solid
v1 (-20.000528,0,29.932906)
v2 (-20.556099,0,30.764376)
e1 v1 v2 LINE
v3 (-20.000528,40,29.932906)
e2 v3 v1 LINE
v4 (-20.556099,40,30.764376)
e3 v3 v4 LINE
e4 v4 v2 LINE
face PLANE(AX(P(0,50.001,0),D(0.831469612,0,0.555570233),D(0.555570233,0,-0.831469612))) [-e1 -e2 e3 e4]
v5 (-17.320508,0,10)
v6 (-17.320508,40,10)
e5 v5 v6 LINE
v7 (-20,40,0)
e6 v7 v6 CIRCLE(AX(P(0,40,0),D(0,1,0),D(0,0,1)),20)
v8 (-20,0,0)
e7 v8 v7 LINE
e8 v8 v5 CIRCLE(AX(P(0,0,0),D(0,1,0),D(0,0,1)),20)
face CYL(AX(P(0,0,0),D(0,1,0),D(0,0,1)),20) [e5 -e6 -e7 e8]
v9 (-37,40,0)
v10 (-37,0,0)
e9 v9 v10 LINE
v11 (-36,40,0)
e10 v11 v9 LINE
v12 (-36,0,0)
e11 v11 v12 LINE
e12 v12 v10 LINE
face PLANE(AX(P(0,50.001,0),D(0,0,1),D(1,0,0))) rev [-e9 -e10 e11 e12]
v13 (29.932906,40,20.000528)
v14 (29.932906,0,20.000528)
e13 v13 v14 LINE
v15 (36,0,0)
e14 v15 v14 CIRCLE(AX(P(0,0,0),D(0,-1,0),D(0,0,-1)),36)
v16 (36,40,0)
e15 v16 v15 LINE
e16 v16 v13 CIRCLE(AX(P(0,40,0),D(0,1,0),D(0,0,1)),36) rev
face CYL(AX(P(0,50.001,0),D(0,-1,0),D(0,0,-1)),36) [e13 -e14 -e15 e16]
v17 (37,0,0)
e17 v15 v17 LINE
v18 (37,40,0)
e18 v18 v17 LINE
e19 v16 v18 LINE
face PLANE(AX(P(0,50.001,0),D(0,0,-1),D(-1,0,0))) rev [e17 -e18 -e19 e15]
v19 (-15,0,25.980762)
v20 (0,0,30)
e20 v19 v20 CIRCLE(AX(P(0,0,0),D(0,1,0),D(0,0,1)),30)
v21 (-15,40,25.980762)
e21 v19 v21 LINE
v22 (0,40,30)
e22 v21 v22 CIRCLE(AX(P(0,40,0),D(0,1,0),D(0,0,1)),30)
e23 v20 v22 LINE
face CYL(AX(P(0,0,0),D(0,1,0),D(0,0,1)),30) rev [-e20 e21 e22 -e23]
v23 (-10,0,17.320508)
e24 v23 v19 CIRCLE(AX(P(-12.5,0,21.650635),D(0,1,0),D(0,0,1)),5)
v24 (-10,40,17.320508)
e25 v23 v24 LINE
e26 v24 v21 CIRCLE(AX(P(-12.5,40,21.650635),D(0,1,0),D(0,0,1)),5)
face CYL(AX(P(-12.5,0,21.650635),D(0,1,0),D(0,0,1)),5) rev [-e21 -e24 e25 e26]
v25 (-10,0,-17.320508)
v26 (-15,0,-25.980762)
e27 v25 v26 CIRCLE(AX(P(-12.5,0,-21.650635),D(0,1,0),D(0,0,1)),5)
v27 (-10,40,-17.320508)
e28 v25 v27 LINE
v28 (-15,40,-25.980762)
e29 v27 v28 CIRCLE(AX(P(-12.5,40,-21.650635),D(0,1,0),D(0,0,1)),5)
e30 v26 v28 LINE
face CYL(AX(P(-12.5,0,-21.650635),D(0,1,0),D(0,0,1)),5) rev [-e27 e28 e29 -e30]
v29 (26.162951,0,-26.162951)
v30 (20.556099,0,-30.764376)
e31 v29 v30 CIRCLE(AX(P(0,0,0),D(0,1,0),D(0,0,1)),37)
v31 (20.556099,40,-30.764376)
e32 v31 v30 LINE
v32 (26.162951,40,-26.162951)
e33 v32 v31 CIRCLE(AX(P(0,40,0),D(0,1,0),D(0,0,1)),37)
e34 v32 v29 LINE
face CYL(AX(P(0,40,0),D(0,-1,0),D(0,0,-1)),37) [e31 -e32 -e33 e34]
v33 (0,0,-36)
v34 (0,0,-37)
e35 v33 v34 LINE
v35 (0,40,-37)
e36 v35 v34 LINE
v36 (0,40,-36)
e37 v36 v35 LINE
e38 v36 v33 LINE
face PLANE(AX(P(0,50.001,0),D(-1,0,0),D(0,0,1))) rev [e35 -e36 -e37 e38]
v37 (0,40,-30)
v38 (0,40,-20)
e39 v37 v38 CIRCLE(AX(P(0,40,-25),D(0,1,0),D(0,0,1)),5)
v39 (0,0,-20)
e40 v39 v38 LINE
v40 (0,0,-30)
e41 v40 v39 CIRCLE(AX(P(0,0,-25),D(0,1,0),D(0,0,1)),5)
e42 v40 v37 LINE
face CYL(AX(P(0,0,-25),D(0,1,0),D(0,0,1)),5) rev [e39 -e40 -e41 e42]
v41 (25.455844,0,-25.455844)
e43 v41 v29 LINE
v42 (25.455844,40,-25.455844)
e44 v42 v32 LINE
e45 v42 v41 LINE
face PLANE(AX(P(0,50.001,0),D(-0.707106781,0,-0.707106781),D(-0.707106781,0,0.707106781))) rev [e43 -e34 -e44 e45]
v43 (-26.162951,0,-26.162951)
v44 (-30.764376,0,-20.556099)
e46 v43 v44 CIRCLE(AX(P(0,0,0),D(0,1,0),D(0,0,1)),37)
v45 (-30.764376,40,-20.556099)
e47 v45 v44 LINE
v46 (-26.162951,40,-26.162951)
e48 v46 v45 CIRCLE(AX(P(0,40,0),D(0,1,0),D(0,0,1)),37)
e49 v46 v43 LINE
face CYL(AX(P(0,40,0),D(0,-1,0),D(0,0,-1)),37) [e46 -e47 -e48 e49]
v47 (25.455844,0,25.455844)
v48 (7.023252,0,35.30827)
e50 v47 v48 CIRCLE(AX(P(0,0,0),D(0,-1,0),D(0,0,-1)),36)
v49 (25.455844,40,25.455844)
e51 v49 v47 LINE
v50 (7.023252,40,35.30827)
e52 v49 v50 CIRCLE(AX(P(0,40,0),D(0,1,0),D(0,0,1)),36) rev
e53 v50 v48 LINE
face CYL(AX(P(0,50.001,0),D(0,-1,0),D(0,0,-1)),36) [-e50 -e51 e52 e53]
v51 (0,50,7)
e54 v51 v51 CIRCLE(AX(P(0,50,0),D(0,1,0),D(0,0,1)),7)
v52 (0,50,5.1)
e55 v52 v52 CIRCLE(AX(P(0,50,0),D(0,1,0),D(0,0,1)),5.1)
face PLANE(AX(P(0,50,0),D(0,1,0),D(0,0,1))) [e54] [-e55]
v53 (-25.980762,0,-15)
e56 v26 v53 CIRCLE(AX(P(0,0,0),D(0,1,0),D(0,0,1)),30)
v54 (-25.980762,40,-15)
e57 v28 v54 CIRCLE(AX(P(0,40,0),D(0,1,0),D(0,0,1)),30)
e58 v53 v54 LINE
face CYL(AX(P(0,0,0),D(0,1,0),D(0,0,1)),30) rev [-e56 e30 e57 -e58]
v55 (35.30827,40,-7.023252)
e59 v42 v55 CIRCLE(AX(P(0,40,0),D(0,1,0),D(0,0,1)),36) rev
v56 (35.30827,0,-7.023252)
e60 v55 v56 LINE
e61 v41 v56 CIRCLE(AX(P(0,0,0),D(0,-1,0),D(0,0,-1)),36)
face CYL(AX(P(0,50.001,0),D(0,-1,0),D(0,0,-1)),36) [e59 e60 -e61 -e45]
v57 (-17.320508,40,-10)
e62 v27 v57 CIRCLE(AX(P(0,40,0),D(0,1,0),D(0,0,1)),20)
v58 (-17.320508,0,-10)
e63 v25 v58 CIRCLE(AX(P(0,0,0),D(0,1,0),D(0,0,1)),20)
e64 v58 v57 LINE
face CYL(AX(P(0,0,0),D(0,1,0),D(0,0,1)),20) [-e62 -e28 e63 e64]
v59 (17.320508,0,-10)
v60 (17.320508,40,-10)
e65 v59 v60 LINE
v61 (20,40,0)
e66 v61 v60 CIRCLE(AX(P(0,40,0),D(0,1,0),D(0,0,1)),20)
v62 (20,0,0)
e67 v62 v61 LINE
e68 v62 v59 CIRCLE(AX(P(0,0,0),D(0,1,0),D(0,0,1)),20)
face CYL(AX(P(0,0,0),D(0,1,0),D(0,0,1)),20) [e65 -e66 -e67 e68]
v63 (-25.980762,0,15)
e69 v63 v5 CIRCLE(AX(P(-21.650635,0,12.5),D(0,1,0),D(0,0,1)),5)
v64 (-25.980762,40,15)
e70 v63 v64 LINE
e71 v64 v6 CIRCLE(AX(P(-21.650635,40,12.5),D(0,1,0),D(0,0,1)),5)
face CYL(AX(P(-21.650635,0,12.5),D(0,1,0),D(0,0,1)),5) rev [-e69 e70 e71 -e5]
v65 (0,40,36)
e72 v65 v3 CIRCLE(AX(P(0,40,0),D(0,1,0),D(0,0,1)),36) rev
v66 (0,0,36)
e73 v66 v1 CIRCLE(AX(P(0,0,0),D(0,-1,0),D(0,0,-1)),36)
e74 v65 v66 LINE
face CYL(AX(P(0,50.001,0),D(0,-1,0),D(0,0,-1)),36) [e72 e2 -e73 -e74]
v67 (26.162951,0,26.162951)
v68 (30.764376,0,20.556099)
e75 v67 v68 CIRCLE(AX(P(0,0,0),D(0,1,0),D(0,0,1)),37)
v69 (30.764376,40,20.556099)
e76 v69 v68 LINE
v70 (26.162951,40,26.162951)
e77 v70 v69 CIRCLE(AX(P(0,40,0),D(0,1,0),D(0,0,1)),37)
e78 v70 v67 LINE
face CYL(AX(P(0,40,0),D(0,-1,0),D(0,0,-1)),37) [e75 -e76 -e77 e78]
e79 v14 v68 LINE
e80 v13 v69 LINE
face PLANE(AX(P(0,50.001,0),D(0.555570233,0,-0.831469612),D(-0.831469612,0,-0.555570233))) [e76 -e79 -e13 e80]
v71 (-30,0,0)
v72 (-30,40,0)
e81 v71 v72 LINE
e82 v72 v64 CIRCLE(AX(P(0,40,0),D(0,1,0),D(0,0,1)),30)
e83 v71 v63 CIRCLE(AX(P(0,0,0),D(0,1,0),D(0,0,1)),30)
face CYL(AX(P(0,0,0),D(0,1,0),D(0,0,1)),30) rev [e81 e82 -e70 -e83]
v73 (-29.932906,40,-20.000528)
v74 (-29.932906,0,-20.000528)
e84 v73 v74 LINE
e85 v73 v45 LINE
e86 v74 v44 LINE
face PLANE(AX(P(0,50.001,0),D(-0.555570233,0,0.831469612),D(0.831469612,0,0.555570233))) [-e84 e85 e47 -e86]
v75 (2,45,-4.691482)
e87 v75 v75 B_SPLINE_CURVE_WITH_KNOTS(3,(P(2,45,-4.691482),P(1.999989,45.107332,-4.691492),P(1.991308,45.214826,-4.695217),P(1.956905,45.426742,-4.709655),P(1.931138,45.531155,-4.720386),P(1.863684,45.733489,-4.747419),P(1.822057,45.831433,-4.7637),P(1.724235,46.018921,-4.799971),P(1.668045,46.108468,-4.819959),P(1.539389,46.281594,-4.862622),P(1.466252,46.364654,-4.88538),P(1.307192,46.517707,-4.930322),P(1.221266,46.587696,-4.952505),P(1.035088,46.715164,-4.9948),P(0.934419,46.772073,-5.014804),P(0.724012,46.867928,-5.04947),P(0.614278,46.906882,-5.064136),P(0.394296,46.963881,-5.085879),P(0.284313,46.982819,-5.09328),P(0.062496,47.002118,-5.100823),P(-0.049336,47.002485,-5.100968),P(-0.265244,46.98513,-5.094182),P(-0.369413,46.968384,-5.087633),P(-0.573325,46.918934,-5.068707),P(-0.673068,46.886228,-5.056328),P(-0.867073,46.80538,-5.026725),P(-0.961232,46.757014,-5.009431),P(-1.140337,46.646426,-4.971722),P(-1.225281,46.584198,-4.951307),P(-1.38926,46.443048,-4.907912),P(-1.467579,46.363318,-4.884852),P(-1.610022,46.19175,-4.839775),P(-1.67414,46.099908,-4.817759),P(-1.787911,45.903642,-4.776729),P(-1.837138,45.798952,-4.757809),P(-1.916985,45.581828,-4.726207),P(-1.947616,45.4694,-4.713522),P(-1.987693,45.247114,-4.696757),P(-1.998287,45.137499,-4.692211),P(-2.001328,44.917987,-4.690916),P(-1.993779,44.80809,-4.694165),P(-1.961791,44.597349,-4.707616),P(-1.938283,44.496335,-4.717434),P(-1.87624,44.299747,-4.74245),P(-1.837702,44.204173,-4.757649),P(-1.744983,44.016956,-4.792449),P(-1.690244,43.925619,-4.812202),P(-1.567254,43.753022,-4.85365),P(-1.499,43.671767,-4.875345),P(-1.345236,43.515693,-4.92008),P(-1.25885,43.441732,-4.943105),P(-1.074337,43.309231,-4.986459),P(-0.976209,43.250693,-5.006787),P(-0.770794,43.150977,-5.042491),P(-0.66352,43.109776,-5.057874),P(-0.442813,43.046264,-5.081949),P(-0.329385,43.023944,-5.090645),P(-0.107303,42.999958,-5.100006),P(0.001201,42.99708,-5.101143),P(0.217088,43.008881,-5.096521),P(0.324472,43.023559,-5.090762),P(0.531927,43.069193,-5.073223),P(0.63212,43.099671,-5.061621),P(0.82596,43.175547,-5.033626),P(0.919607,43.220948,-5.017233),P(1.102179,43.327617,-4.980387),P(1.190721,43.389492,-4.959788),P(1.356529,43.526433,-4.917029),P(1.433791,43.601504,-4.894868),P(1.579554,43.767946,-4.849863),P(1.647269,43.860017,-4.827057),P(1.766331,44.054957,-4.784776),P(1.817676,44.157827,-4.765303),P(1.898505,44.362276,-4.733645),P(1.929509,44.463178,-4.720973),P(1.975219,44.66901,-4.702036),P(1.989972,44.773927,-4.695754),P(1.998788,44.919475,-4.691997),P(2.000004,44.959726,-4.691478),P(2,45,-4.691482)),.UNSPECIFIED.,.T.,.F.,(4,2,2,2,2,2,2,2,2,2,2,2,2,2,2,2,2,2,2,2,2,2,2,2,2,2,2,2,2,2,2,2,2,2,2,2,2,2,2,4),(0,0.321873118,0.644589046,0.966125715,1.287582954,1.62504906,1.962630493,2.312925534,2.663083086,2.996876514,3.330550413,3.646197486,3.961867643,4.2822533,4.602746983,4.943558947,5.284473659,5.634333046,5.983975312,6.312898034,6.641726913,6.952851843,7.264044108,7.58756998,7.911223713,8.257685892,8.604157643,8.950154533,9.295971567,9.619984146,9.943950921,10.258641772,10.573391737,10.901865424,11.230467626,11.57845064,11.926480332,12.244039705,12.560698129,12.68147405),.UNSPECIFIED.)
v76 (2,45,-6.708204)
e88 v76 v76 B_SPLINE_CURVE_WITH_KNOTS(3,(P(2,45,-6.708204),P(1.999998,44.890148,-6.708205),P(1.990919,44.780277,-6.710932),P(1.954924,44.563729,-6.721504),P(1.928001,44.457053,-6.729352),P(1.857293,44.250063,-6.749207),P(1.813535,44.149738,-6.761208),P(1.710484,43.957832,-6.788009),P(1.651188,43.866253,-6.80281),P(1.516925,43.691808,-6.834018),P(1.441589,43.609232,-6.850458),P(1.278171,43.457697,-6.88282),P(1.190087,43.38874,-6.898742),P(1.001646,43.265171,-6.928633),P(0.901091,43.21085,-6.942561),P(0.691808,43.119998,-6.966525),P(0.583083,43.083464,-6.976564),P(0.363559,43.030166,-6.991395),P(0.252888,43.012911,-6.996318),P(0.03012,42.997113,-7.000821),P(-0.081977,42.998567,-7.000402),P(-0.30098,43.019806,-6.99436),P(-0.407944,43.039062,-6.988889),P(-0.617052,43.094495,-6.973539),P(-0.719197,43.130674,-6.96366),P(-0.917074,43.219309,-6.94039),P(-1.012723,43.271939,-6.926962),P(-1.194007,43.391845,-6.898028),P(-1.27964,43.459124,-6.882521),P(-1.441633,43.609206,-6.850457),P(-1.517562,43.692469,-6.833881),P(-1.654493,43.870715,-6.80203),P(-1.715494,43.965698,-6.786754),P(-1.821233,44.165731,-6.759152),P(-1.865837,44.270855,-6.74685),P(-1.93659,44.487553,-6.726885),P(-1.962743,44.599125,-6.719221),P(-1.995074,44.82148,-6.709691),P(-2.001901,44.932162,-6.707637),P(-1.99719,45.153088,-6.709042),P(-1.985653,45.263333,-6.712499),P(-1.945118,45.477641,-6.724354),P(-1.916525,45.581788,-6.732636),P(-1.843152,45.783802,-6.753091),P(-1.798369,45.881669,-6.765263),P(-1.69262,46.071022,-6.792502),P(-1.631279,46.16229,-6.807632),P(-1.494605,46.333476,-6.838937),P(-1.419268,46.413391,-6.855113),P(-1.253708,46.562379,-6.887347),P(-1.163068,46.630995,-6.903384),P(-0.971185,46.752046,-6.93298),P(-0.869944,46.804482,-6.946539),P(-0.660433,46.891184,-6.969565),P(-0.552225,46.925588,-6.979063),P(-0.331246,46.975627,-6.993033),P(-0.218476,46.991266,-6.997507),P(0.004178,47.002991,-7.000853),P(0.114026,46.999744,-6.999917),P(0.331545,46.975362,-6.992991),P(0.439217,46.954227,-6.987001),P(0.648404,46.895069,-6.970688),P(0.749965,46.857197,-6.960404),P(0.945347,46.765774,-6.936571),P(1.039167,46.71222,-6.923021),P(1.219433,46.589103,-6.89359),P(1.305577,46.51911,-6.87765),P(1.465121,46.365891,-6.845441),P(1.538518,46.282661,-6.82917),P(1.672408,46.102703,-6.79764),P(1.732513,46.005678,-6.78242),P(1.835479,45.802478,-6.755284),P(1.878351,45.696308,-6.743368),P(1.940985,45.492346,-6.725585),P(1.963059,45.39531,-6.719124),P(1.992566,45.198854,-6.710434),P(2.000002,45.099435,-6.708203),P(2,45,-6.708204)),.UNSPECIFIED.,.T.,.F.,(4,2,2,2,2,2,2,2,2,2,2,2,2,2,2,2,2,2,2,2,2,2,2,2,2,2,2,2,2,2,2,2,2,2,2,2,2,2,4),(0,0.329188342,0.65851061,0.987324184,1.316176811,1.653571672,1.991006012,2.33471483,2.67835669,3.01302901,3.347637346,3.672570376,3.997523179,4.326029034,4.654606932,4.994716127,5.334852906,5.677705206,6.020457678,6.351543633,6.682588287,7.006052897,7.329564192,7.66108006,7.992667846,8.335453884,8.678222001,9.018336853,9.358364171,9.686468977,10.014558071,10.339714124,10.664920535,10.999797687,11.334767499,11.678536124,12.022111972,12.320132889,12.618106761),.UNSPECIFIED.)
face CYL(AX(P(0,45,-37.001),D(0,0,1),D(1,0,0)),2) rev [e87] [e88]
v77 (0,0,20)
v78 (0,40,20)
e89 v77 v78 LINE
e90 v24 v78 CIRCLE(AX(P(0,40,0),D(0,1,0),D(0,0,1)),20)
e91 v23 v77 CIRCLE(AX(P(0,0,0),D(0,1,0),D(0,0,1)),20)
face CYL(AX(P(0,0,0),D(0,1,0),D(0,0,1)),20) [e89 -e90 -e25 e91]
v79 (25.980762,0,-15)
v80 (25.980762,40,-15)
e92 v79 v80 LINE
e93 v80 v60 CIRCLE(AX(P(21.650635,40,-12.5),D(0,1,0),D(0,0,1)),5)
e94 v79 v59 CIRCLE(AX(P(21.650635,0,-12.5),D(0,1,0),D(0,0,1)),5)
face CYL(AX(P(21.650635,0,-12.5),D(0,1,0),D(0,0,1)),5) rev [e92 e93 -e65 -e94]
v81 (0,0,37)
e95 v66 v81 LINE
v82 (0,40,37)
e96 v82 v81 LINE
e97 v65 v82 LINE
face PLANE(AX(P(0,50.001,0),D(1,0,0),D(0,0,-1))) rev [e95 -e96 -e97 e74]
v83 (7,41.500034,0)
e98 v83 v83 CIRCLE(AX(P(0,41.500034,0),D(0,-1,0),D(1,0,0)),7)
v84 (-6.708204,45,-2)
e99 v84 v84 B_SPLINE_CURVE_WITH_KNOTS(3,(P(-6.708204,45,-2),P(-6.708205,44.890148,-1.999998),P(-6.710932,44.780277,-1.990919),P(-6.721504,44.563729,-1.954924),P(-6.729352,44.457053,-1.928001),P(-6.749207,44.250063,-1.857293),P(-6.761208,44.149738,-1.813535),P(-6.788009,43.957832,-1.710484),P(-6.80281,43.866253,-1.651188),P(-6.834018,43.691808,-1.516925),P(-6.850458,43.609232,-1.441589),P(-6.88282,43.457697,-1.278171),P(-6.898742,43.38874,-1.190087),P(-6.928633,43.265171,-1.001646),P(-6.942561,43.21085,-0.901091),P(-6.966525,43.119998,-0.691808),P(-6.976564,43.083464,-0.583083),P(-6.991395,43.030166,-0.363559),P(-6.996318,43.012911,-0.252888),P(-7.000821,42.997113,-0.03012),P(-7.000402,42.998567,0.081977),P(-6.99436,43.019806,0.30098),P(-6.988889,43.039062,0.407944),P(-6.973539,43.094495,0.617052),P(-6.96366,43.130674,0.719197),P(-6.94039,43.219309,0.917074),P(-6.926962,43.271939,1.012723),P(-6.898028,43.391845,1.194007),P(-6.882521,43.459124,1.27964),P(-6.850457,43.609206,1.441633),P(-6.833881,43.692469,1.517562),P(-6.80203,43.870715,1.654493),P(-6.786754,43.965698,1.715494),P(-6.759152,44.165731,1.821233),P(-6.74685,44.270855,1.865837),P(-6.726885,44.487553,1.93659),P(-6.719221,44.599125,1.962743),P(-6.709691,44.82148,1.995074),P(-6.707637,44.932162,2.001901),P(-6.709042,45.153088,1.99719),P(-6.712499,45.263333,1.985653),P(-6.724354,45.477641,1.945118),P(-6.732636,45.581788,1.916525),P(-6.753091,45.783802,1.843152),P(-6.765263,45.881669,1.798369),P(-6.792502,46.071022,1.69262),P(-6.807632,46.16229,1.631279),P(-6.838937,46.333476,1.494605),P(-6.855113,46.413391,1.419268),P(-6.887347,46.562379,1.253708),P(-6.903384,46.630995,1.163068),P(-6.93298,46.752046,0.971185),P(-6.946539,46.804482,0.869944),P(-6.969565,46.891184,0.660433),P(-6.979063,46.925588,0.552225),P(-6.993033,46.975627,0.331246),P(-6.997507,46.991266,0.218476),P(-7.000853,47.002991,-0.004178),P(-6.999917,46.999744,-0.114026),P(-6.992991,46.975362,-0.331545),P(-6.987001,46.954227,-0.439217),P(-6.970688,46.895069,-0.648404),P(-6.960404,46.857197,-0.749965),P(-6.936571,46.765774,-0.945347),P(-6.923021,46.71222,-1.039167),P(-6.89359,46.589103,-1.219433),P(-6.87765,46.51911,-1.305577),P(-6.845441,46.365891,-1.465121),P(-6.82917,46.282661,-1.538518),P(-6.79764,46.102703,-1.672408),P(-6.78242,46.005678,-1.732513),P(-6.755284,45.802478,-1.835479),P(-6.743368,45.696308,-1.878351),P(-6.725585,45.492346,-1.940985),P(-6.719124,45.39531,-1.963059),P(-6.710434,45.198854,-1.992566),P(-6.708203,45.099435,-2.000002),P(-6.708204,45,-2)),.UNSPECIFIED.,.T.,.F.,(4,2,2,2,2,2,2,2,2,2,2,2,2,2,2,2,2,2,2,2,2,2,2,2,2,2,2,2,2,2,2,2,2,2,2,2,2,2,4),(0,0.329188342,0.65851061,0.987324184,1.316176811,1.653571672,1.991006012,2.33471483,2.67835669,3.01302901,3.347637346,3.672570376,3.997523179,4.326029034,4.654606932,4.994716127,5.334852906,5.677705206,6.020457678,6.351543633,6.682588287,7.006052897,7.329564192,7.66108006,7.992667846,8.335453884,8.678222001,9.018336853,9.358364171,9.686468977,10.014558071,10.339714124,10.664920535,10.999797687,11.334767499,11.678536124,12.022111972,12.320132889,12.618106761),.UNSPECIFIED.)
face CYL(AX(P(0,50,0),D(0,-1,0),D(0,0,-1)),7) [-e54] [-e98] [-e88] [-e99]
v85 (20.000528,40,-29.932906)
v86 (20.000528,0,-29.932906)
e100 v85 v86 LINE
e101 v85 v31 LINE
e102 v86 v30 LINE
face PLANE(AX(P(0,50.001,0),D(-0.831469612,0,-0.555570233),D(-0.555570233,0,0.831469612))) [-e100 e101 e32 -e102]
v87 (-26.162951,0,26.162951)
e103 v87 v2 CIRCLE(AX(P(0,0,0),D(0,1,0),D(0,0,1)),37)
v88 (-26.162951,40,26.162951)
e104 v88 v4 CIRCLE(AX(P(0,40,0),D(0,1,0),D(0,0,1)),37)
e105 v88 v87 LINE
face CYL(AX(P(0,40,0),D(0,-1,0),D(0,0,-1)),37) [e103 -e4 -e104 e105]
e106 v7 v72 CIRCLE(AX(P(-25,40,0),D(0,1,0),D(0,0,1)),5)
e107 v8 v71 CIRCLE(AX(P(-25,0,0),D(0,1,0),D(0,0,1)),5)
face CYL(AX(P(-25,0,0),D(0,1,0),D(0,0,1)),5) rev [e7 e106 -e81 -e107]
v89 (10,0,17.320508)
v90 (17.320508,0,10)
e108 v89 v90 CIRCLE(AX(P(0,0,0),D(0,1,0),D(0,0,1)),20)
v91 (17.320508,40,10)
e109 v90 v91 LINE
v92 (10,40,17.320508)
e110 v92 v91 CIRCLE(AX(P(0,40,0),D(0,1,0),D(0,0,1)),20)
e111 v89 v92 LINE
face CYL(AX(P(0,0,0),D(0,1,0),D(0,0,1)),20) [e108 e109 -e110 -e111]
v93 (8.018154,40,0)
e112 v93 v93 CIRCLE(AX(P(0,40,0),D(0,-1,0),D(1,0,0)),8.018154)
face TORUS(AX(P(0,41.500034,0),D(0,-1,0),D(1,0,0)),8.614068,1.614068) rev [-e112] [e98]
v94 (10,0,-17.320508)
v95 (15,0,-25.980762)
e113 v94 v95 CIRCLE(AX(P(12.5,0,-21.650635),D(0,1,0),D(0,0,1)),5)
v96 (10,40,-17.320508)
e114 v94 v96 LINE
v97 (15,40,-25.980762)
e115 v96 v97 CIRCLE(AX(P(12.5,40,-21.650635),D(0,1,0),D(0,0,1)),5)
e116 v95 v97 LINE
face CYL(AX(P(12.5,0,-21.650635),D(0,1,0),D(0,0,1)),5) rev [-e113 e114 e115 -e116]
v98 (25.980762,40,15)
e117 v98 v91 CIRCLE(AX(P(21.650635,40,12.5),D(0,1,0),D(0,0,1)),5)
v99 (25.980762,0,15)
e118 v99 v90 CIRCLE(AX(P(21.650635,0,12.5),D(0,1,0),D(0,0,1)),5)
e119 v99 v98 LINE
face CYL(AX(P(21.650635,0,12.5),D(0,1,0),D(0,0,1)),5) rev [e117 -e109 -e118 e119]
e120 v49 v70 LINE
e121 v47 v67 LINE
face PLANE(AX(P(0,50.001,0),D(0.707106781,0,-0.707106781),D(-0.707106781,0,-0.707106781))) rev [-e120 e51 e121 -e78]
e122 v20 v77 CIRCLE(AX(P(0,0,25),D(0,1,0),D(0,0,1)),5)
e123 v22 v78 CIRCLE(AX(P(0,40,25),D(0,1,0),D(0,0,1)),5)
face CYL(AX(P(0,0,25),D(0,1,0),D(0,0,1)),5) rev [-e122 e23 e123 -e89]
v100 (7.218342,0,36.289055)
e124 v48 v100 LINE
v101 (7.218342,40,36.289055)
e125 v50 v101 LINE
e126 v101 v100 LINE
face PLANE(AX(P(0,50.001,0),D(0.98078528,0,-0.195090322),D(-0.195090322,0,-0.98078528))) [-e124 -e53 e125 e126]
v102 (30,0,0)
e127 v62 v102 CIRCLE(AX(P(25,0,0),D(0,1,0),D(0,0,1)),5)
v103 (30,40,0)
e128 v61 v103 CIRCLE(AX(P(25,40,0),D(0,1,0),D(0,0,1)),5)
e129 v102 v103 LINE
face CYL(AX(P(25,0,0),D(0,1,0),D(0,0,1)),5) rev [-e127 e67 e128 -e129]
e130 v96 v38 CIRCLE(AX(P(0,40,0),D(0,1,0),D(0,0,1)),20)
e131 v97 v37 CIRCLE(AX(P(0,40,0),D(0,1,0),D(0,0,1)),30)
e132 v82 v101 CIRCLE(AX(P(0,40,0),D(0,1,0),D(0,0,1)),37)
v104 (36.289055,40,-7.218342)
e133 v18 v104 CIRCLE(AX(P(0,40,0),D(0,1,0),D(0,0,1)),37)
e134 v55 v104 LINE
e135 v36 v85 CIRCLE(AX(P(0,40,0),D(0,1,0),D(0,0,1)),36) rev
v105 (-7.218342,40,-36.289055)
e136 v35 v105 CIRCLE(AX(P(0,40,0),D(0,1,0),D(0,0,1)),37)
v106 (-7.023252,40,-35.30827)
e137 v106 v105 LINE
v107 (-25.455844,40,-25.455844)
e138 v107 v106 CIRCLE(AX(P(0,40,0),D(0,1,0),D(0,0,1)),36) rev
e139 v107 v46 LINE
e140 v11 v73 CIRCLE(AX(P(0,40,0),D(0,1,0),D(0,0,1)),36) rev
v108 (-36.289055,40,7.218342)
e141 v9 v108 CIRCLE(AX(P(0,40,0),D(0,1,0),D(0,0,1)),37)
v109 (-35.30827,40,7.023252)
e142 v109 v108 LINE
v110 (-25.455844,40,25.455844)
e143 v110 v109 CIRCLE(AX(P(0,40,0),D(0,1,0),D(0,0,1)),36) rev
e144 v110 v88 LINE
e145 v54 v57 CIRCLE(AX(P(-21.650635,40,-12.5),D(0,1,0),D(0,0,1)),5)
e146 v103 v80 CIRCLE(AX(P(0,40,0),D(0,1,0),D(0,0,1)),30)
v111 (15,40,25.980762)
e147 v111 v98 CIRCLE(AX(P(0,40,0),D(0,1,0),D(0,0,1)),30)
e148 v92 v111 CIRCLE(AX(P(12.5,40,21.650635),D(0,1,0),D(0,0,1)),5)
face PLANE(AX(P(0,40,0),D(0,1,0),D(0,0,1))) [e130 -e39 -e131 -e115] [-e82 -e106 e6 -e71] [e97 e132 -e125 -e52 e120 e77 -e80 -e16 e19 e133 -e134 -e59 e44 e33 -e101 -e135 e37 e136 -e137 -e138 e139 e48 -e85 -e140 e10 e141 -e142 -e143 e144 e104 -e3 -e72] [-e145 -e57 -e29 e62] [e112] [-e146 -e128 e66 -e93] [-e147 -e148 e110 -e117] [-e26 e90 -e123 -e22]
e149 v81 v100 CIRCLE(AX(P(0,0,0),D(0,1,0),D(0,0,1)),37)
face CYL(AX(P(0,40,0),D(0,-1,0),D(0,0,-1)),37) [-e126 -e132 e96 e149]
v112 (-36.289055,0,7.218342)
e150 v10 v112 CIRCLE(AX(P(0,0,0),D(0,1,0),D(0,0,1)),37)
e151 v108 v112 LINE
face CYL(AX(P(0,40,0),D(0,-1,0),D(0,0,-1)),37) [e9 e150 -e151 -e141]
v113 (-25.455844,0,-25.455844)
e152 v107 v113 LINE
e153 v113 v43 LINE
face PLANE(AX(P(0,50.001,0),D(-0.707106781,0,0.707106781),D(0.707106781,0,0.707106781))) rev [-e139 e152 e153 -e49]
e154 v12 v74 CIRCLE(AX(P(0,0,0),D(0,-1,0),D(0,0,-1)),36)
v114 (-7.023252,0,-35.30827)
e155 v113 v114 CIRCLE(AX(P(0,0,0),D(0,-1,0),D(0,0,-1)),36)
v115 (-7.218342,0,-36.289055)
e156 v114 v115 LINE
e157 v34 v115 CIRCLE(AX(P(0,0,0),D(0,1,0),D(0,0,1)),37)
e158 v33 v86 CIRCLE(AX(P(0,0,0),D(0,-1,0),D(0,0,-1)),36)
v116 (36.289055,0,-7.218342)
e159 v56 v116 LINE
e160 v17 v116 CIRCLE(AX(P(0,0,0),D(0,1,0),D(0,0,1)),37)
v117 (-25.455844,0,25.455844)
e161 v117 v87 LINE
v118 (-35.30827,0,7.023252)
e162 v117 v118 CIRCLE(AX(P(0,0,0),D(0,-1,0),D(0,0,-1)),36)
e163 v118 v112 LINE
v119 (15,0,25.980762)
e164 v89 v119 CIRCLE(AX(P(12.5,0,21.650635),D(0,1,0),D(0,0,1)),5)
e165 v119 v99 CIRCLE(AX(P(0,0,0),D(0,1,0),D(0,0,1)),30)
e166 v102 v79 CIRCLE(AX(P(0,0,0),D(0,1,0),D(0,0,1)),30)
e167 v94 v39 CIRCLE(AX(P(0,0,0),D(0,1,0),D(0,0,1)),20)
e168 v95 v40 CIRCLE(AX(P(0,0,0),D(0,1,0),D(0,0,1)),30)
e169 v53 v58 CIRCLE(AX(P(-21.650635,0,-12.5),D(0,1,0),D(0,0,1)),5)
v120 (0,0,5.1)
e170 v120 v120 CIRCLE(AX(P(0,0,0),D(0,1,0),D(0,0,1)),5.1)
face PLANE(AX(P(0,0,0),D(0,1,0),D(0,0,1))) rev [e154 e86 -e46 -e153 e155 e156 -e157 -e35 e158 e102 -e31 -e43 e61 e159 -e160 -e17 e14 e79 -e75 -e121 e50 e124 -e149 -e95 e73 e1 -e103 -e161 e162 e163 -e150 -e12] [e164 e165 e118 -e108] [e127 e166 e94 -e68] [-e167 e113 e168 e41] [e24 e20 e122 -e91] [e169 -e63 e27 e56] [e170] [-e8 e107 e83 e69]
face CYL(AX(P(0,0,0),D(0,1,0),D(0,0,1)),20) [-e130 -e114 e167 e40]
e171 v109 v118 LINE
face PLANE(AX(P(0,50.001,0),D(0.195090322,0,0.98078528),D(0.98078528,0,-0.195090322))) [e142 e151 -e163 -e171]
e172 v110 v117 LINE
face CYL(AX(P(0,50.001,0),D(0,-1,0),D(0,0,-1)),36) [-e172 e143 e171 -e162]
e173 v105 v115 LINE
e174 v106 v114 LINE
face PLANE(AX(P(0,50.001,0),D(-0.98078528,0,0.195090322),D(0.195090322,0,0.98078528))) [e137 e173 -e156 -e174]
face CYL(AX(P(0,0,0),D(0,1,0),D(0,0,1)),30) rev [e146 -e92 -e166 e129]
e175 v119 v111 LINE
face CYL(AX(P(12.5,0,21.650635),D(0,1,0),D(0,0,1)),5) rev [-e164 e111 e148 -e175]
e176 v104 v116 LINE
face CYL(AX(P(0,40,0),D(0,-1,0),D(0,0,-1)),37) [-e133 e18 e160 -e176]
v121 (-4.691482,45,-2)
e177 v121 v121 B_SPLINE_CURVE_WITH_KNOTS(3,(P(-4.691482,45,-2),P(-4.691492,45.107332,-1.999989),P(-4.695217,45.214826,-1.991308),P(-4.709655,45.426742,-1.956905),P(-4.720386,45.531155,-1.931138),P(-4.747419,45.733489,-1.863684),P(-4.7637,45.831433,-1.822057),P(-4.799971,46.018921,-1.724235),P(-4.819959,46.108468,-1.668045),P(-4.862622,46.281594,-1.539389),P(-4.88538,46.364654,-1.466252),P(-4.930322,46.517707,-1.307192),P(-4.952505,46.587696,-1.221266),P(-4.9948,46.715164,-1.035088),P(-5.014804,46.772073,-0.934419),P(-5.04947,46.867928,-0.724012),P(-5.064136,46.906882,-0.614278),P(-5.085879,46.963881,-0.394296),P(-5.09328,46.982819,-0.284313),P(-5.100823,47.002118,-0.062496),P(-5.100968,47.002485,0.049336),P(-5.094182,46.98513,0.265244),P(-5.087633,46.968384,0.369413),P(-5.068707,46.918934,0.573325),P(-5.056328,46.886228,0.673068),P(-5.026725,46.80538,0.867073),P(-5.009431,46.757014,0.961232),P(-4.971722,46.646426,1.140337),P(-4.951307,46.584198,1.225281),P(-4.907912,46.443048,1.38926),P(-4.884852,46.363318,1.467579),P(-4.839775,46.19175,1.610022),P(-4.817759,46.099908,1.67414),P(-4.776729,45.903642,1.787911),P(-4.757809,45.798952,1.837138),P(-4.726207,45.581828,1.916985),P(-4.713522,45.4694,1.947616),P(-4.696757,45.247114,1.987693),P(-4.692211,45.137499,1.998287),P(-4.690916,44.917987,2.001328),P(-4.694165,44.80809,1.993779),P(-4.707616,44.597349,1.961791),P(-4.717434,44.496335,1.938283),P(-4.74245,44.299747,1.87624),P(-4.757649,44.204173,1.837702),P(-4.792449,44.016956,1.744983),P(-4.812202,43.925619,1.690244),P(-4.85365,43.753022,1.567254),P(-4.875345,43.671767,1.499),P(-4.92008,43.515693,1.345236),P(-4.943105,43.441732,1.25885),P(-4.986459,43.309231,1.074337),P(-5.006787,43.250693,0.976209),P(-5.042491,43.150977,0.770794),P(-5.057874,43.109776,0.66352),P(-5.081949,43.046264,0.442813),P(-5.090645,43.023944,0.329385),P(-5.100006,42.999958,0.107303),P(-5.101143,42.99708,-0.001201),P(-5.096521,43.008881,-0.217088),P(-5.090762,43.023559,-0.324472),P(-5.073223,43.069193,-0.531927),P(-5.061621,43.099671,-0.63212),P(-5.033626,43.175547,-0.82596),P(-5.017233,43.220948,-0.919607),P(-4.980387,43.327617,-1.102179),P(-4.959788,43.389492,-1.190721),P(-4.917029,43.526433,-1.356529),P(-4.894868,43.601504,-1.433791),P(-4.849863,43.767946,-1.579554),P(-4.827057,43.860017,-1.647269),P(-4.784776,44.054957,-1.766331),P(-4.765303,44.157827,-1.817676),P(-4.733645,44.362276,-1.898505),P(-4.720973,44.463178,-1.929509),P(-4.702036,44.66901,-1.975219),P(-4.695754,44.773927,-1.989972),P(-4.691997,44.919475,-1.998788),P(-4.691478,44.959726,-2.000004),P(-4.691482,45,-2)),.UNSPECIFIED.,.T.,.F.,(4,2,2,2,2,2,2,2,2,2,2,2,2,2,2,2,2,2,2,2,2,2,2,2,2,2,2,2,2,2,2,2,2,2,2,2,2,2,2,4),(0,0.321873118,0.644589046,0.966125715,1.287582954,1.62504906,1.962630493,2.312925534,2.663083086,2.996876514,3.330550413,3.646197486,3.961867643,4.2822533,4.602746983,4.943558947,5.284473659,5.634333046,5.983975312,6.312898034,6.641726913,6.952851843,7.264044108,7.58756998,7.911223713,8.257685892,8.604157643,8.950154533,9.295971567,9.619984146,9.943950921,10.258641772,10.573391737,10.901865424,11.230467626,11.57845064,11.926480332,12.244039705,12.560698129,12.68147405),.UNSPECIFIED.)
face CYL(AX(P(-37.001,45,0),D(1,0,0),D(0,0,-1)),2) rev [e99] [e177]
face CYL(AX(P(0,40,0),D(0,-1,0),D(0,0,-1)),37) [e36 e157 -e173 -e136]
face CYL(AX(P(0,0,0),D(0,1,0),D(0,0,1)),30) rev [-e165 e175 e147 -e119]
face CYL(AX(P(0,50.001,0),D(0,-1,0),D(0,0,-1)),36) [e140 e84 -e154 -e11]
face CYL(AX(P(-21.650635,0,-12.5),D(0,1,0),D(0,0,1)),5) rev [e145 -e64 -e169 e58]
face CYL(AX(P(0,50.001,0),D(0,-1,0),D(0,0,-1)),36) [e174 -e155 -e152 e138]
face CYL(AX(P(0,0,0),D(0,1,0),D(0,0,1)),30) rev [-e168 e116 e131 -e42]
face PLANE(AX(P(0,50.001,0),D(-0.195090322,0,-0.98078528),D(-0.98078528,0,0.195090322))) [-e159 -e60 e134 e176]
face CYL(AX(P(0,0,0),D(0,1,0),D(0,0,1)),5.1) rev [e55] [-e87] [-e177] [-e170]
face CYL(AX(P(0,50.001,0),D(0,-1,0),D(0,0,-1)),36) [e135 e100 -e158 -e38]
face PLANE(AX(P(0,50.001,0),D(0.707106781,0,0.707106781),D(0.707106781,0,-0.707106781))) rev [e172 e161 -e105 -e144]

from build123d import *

# Parameters (mm, degrees)
SKETCH_1_R               = 37
EXTRUDE_1_DEPTH          = 40
SKETCH_2_R               = 5.1
CUT_EXTRUDE_1_DEPTH      = 40
CUT_EXTRUDE_START        = -40
CUT_EXTRUDE_2_DEPTH      = 40
SKETCH_4_R               = 7
SKETCH_4_R_2             = 5.1
EXTRUDE_2_DEPTH          = 10
CUT_EXTRUDE_3_REACH      = 74.374
CUT_EXTRUDE_3_END_RADIUS = 7
SKETCH_6_R               = 2
CUT_EXTRUDE_4_REACH      = 74.374
CUT_EXTRUDE_4_END_RADIUS = 7
SKETCH_7_R               = 2
CUT_EXTRUDE_7_REACH      = 74.374
EXTRUDE_START            = -40
SKETCH_14_R              = 36
EXTRUDE_4_DEPTH          = 40
CUT_EXTRUDE_11_DEPTH     = 40
SKETCH_17_R              = 5.1
CUT_EXTRUDE_12_DEPTH     = 40


# Read off the part's stored shape, not the designer's step: the extrude step
with BuildPart() as part:
    # 草图1 → 凸台-拉伸1 (new body)
    with BuildSketch(Plane(origin=(0, 0, 0), x_dir=(1, 0, 0), z_dir=(0, 1, 0))):
        with Locations(Location((0, 0, 0), (0, 0, 270))):
            Circle(SKETCH_1_R)
    extrude(amount=EXTRUDE_1_DEPTH)

    # 草图2 → 切除-拉伸1 (cut)
    with BuildSketch(Plane(origin=(0, 40, 0), x_dir=(1, 0, 0), z_dir=(0, 1, 0))):
        with Locations(Location((0, 0, 0), (0, 0, 270))):
            Circle(SKETCH_2_R)
    extrude(amount=-CUT_EXTRUDE_1_DEPTH, mode=Mode.SUBTRACT)

    # 切除-拉伸2 outline → 切除-拉伸2 (cut)
    with BuildSketch(Plane(origin=(0, 40, 0), x_dir=(1, 0, 0), z_dir=(0, 1, 0)).offset(CUT_EXTRUDE_START)):
        with BuildLine():
            ThreePointArc((0, 25), (5, 30), (0, 35))
            ThreePointArc((0, 35), (-17.5, 30.310889132), (-30.310889132, 17.5))
            ThreePointArc((-30.310889132, 17.5), (-28.480762114, 10.669872981), (-21.650635095, 12.5))
            ThreePointArc((-21.650635095, 12.5), (-12.5, 21.650635095), (0, 25))
        make_face()
        with BuildLine():
            ThreePointArc((-21.650635095, -12.5), (-28.480762114, -10.669872981), (-30.310889132, -17.5))
            ThreePointArc((-30.310889132, -17.5), (-17.5, -30.310889132), (0, -35))
            ThreePointArc((0, -35), (5, -30), (0, -25))
            ThreePointArc((0, -25), (-12.5, -21.650635095), (-21.650635095, -12.5))
        make_face()
        with BuildLine():
            ThreePointArc((21.650635095, -12.5), (23.480762113, -19.330127019), (30.310889132, -17.5))
            ThreePointArc((30.310889132, -17.5), (35, 0), (30.310889132, 17.5))
            ThreePointArc((30.310889132, 17.5), (23.480762113, 19.330127019), (21.650635095, 12.5))
            ThreePointArc((21.650635095, 12.5), (25, 0), (21.650635095, -12.5))
        make_face()
    extrude(amount=CUT_EXTRUDE_2_DEPTH, mode=Mode.SUBTRACT)

    # 草图4 → 凸台-拉伸2 (add, symmetric)
    with BuildSketch(Plane(origin=(0, 40, 0), x_dir=(1, 0, 0), z_dir=(0, 1, 0))):
        with Locations(Location((0, 0, 0), (0, 0, 270))):
            Circle(SKETCH_4_R)
        with Locations(Location((0, 0, 0), (0, 0, 270))):
            Circle(SKETCH_4_R_2, mode=Mode.SUBTRACT)
    extrude(amount=EXTRUDE_2_DEPTH, both=True)

    # 切除-拉伸3: up to this cylinder (the profile starts inside it)
    cut_extrude_3_end = Plane(origin=(0, 45, 0), z_dir=(0, -1, 0)) * Cylinder(CUT_EXTRUDE_3_END_RADIUS, 163.748, mode=Mode.PRIVATE)
    # 草图6 → 切除-拉伸3 (cut, up to the surface)
    with BuildSketch(Plane.XY, mode=Mode.PRIVATE) as cut_extrude_3_sk1:
        with Locations((0, 45)):
            Circle(SKETCH_6_R)
    cut_extrude_3_tool1 = extrude(cut_extrude_3_sk1.sketch, amount=-CUT_EXTRUDE_3_REACH, mode=Mode.PRIVATE) & cut_extrude_3_end
    add(cut_extrude_3_tool1.solids().sort_by_distance((0, 45, 0))[0], mode=Mode.SUBTRACT)

    # 切除-拉伸4: up to this cylinder (the profile starts inside it)
    cut_extrude_4_end = Plane(origin=(0, 45, 0), z_dir=(0, -1, 0)) * Cylinder(CUT_EXTRUDE_4_END_RADIUS, 163.748, mode=Mode.PRIVATE)
    # 草图7 → 切除-拉伸4 (cut, up to the surface)
    with BuildSketch(Plane(origin=(0, 0, 0), x_dir=(0, 0, -1), z_dir=(1, 0, 0)), mode=Mode.PRIVATE) as cut_extrude_4_sk1:
        with Locations((0, 45)):
            Circle(SKETCH_7_R)
    cut_extrude_4_tool1 = extrude(cut_extrude_4_sk1.sketch, amount=-CUT_EXTRUDE_4_REACH, mode=Mode.PRIVATE) & cut_extrude_4_end
    add(cut_extrude_4_tool1.solids().sort_by_distance((0, 45, 0))[0], mode=Mode.SUBTRACT)

    # 草图10 → 切除-拉伸7 (cut, up to next)
    with BuildSketch(Plane.XZ, mode=Mode.PRIVATE) as cut_extrude_7_sk1:
        with BuildLine():
            Line((-36.289055375, 7.218341915), (-35.308270095, 7.023251593))
            ThreePointArc((-35.308270095, 7.023251593), (-34.449852086, 10.450248381), (-33.25966317, 13.776603565))
            Line((-33.25966317, 13.776603565), (-34.183542703, 14.159286998))
            ThreePointArc((-34.183542703, 14.159286998), (-35.406792422, 10.740533058), (-36.289055375, 7.218341915))
        make_face()
    cut_extrude_7_tool1 = extrude(cut_extrude_7_sk1.sketch, amount=-CUT_EXTRUDE_7_REACH, mode=Mode.PRIVATE) & part.part
    # 草图10 → 切除-拉伸7 (cut, up to next)
    with BuildSketch(Plane.XZ, mode=Mode.PRIVATE) as cut_extrude_7_sk2:
        with BuildLine():
            Line((-34.183542703, 14.159286998), (-33.25966317, 13.776603565))
            ThreePointArc((-33.25966317, 13.776603565), (-31.749165517, 16.970282526), (-29.932906043, 20.000528389))
            Line((-29.932906043, 20.000528389), (-30.764375655, 20.556098622))
            ThreePointArc((-30.764375655, 20.556098622), (-32.631086781, 17.441679263), (-34.183542703, 14.159286998))
        make_face()
    cut_extrude_7_tool2 = extrude(cut_extrude_7_sk2.sketch, amount=-CUT_EXTRUDE_7_REACH, mode=Mode.PRIVATE) & part.part
    # 草图10 → 切除-拉伸7 (cut, up to next)
    with BuildSketch(Plane.XZ, mode=Mode.PRIVATE) as cut_extrude_7_sk3:
        with BuildLine():
            Line((-30.764375655, 20.556098622), (-29.932906043, 20.000528389))
            ThreePointArc((-29.932906043, 20.000528389), (-27.828376321, 22.83815823), (-25.455844123, 25.455844123))
            Line((-25.455844123, 25.455844123), (-26.162950904, 26.162950904))
            ThreePointArc((-26.162950904, 26.162950904), (-28.601386774, 23.472551514), (-30.764375655, 20.556098622))
        make_face()
    cut_extrude_7_tool3 = extrude(cut_extrude_7_sk3.sketch, amount=-CUT_EXTRUDE_7_REACH, mode=Mode.PRIVATE) & part.part
    # 草图10 → 切除-拉伸7 (cut, up to next)
    with BuildSketch(Plane.XZ, mode=Mode.PRIVATE) as cut_extrude_7_sk4:
        with BuildLine():
            Line((-20.556098622, 30.764375655), (-20.000528389, 29.932906043))
            ThreePointArc((-20.000528389, 29.932906043), (-16.970282526, 31.749165517), (-13.776603565, 33.25966317))
            Line((-13.776603565, 33.25966317), (-14.159286998, 34.183542703))
            ThreePointArc((-14.159286998, 34.183542703), (-17.441679263, 32.631086781), (-20.556098622, 30.764375655))
        make_face()
    cut_extrude_7_tool4 = extrude(cut_extrude_7_sk4.sketch, amount=-CUT_EXTRUDE_7_REACH, mode=Mode.PRIVATE) & part.part
    # 草图10 → 切除-拉伸7 (cut, up to next)
    with BuildSketch(Plane.XZ, mode=Mode.PRIVATE) as cut_extrude_7_sk5:
        with BuildLine():
            Line((-14.159286998, 34.183542703), (-13.776603565, 33.25966317))
            ThreePointArc((-13.776603565, 33.25966317), (-10.450248381, 34.449852086), (-7.023251593, 35.308270095))
            Line((-7.023251593, 35.308270095), (-7.218341915, 36.289055375))
            ThreePointArc((-7.218341915, 36.289055375), (-10.740533058, 35.406792422), (-14.159286998, 34.183542703))
        make_face()
    cut_extrude_7_tool5 = extrude(cut_extrude_7_sk5.sketch, amount=-CUT_EXTRUDE_7_REACH, mode=Mode.PRIVATE) & part.part
    # 草图10 → 切除-拉伸7 (cut, up to next)
    with BuildSketch(Plane.XZ, mode=Mode.PRIVATE) as cut_extrude_7_sk6:
        with BuildLine():
            ThreePointArc((-7.023251593, 35.308270095), (-3.528617052, 35.82665016), (0, 36))
            Line((0, 36), (0, 37))
            ThreePointArc((0, 37), (-3.626634192, 36.821834887), (-7.218341915, 36.289055375))
            Line((-7.218341915, 36.289055375), (-7.023251593, 35.308270095))
        make_face()
    cut_extrude_7_tool6 = extrude(cut_extrude_7_sk6.sketch, amount=-CUT_EXTRUDE_7_REACH, mode=Mode.PRIVATE) & part.part
    # 草图10 → 切除-拉伸7 (cut, up to next)
    with BuildSketch(Plane.XZ, mode=Mode.PRIVATE) as cut_extrude_7_sk7:
        with BuildLine():
            Line((7.218341915, 36.289055375), (7.023251593, 35.308270095))
            ThreePointArc((7.023251593, 35.308270095), (10.450248381, 34.449852086), (13.776603565, 33.25966317))
            Line((13.776603565, 33.25966317), (14.159286998, 34.183542703))
            ThreePointArc((14.159286998, 34.183542703), (10.740533058, 35.406792422), (7.218341915, 36.289055375))
        make_face()
    cut_extrude_7_tool7 = extrude(cut_extrude_7_sk7.sketch, amount=-CUT_EXTRUDE_7_REACH, mode=Mode.PRIVATE) & part.part
    # 草图10 → 切除-拉伸7 (cut, up to next)
    with BuildSketch(Plane.XZ, mode=Mode.PRIVATE) as cut_extrude_7_sk8:
        with BuildLine():
            Line((14.159286998, 34.183542703), (13.776603565, 33.25966317))
            ThreePointArc((13.776603565, 33.25966317), (16.970282526, 31.749165517), (20.000528389, 29.932906043))
            Line((20.000528389, 29.932906043), (20.556098622, 30.764375655))
            ThreePointArc((20.556098622, 30.764375655), (17.441679263, 32.631086781), (14.159286998, 34.183542703))
        make_face()
    cut_extrude_7_tool8 = extrude(cut_extrude_7_sk8.sketch, amount=-CUT_EXTRUDE_7_REACH, mode=Mode.PRIVATE) & part.part
    # 草图10 → 切除-拉伸7 (cut, up to next)
    with BuildSketch(Plane.XZ, mode=Mode.PRIVATE) as cut_extrude_7_sk9:
        with BuildLine():
            Line((20.556098622, 30.764375655), (20.000528389, 29.932906043))
            ThreePointArc((20.000528389, 29.932906043), (22.83815823, 27.828376321), (25.455844123, 25.455844123))
            Line((25.455844123, 25.455844123), (26.162950904, 26.162950904))
            ThreePointArc((26.162950904, 26.162950904), (23.472551514, 28.601386774), (20.556098622, 30.764375655))
        make_face()
    cut_extrude_7_tool9 = extrude(cut_extrude_7_sk9.sketch, amount=-CUT_EXTRUDE_7_REACH, mode=Mode.PRIVATE) & part.part
    # 草图10 → 切除-拉伸7 (cut, up to next)
    with BuildSketch(Plane.XZ, mode=Mode.PRIVATE) as cut_extrude_7_sk10:
        with BuildLine():
            Line((30.764375655, 20.556098622), (29.932906043, 20.000528389))
            ThreePointArc((29.932906043, 20.000528389), (31.749165517, 16.970282526), (33.25966317, 13.776603565))
            Line((33.25966317, 13.776603565), (34.183542703, 14.159286998))
            ThreePointArc((34.183542703, 14.159286998), (32.631086781, 17.441679263), (30.764375655, 20.556098622))
        make_face()
    cut_extrude_7_tool10 = extrude(cut_extrude_7_sk10.sketch, amount=-CUT_EXTRUDE_7_REACH, mode=Mode.PRIVATE) & part.part
    # 草图10 → 切除-拉伸7 (cut, up to next)
    with BuildSketch(Plane.XZ, mode=Mode.PRIVATE) as cut_extrude_7_sk11:
        with BuildLine():
            Line((34.183542703, 14.159286998), (33.25966317, 13.776603565))
            ThreePointArc((33.25966317, 13.776603565), (34.449852086, 10.450248381), (35.308270095, 7.023251593))
            Line((35.308270095, 7.023251593), (36.289055375, 7.218341915))
            ThreePointArc((36.289055375, 7.218341915), (35.406792422, 10.740533058), (34.183542703, 14.159286998))
        make_face()
    cut_extrude_7_tool11 = extrude(cut_extrude_7_sk11.sketch, amount=-CUT_EXTRUDE_7_REACH, mode=Mode.PRIVATE) & part.part
    # 草图10 → 切除-拉伸7 (cut, up to next)
    with BuildSketch(Plane.XZ, mode=Mode.PRIVATE) as cut_extrude_7_sk12:
        with BuildLine():
            Line((36.289055375, 7.218341915), (35.308270095, 7.023251593))
            ThreePointArc((35.308270095, 7.023251593), (35.82665016, 3.528617052), (36, 0))
            Line((36, 0), (37, 0))
            ThreePointArc((37, 0), (36.821834887, 3.626634192), (36.289055375, 7.218341915))
        make_face()
    cut_extrude_7_tool12 = extrude(cut_extrude_7_sk12.sketch, amount=-CUT_EXTRUDE_7_REACH, mode=Mode.PRIVATE) & part.part
    # 草图10 → 切除-拉伸7 (cut, up to next)
    with BuildSketch(Plane.XZ, mode=Mode.PRIVATE) as cut_extrude_7_sk13:
        with BuildLine():
            Line((36.289055375, -7.218341915), (35.308270095, -7.023251593))
            ThreePointArc((35.308270095, -7.023251593), (34.449852086, -10.450248381), (33.25966317, -13.776603565))
            Line((33.25966317, -13.776603565), (34.183542703, -14.159286998))
            ThreePointArc((34.183542703, -14.159286998), (35.406792422, -10.740533058), (36.289055375, -7.218341915))
        make_face()
    cut_extrude_7_tool13 = extrude(cut_extrude_7_sk13.sketch, amount=-CUT_EXTRUDE_7_REACH, mode=Mode.PRIVATE) & part.part
    # 草图10 → 切除-拉伸7 (cut, up to next)
    with BuildSketch(Plane.XZ, mode=Mode.PRIVATE) as cut_extrude_7_sk14:
        with BuildLine():
            Line((34.183542703, -14.159286998), (33.25966317, -13.776603565))
            ThreePointArc((33.25966317, -13.776603565), (31.749165517, -16.970282526), (29.932906043, -20.000528389))
            Line((29.932906043, -20.000528389), (30.764375655, -20.556098622))
            ThreePointArc((30.764375655, -20.556098622), (32.631086781, -17.441679263), (34.183542703, -14.159286998))
        make_face()
    cut_extrude_7_tool14 = extrude(cut_extrude_7_sk14.sketch, amount=-CUT_EXTRUDE_7_REACH, mode=Mode.PRIVATE) & part.part
    # 草图10 → 切除-拉伸7 (cut, up to next)
    with BuildSketch(Plane.XZ, mode=Mode.PRIVATE) as cut_extrude_7_sk15:
        with BuildLine():
            Line((30.764375655, -20.556098622), (29.932906043, -20.000528389))
            ThreePointArc((29.932906043, -20.000528389), (27.828376321, -22.83815823), (25.455844123, -25.455844123))
            Line((25.455844123, -25.455844123), (26.162950904, -26.162950904))
            ThreePointArc((26.162950904, -26.162950904), (28.601386774, -23.472551514), (30.764375655, -20.556098622))
        make_face()
    cut_extrude_7_tool15 = extrude(cut_extrude_7_sk15.sketch, amount=-CUT_EXTRUDE_7_REACH, mode=Mode.PRIVATE) & part.part
    # 草图10 → 切除-拉伸7 (cut, up to next)
    with BuildSketch(Plane.XZ, mode=Mode.PRIVATE) as cut_extrude_7_sk16:
        with BuildLine():
            Line((20.556098622, -30.764375655), (20.000528389, -29.932906043))
            ThreePointArc((20.000528389, -29.932906043), (16.970282526, -31.749165517), (13.776603565, -33.25966317))
            Line((13.776603565, -33.25966317), (14.159286998, -34.183542703))
            ThreePointArc((14.159286998, -34.183542703), (17.441679263, -32.631086781), (20.556098622, -30.764375655))
        make_face()
    cut_extrude_7_tool16 = extrude(cut_extrude_7_sk16.sketch, amount=-CUT_EXTRUDE_7_REACH, mode=Mode.PRIVATE) & part.part
    # 草图10 → 切除-拉伸7 (cut, up to next)
    with BuildSketch(Plane.XZ, mode=Mode.PRIVATE) as cut_extrude_7_sk17:
        with BuildLine():
            Line((14.159286998, -34.183542703), (13.776603565, -33.25966317))
            ThreePointArc((13.776603565, -33.25966317), (10.450248381, -34.449852086), (7.023251593, -35.308270095))
            Line((7.023251593, -35.308270095), (7.218341915, -36.289055375))
            ThreePointArc((7.218341915, -36.289055375), (10.740533058, -35.406792422), (14.159286998, -34.183542703))
        make_face()
    cut_extrude_7_tool17 = extrude(cut_extrude_7_sk17.sketch, amount=-CUT_EXTRUDE_7_REACH, mode=Mode.PRIVATE) & part.part
    # 草图10 → 切除-拉伸7 (cut, up to next)
    with BuildSketch(Plane.XZ, mode=Mode.PRIVATE) as cut_extrude_7_sk18:
        with BuildLine():
            Line((7.218341915, -36.289055375), (7.023251593, -35.308270095))
            ThreePointArc((7.023251593, -35.308270095), (3.528617052, -35.82665016), (0, -36))
            Line((0, -36), (0, -37))
            ThreePointArc((0, -37), (3.626634192, -36.821834887), (7.218341915, -36.289055375))
        make_face()
    cut_extrude_7_tool18 = extrude(cut_extrude_7_sk18.sketch, amount=-CUT_EXTRUDE_7_REACH, mode=Mode.PRIVATE) & part.part
    # 草图10 → 切除-拉伸7 (cut, up to next)
    with BuildSketch(Plane.XZ, mode=Mode.PRIVATE) as cut_extrude_7_sk19:
        with BuildLine():
            Line((-7.218341915, -36.289055375), (-7.023251593, -35.308270095))
            ThreePointArc((-7.023251593, -35.308270095), (-10.450248381, -34.449852086), (-13.776603565, -33.25966317))
            Line((-13.776603565, -33.25966317), (-14.159286998, -34.183542703))
            ThreePointArc((-14.159286998, -34.183542703), (-10.740533058, -35.406792422), (-7.218341915, -36.289055375))
        make_face()
    cut_extrude_7_tool19 = extrude(cut_extrude_7_sk19.sketch, amount=-CUT_EXTRUDE_7_REACH, mode=Mode.PRIVATE) & part.part
    # 草图10 → 切除-拉伸7 (cut, up to next)
    with BuildSketch(Plane.XZ, mode=Mode.PRIVATE) as cut_extrude_7_sk20:
        with BuildLine():
            Line((-14.159286998, -34.183542703), (-13.776603565, -33.25966317))
            ThreePointArc((-13.776603565, -33.25966317), (-16.970282526, -31.749165517), (-20.000528389, -29.932906043))
            Line((-20.000528389, -29.932906043), (-20.556098622, -30.764375655))
            ThreePointArc((-20.556098622, -30.764375655), (-17.441679263, -32.631086781), (-14.159286998, -34.183542703))
        make_face()
    cut_extrude_7_tool20 = extrude(cut_extrude_7_sk20.sketch, amount=-CUT_EXTRUDE_7_REACH, mode=Mode.PRIVATE) & part.part
    # 草图10 → 切除-拉伸7 (cut, up to next)
    with BuildSketch(Plane.XZ, mode=Mode.PRIVATE) as cut_extrude_7_sk21:
        with BuildLine():
            Line((-20.556098622, -30.764375655), (-20.000528389, -29.932906043))
            ThreePointArc((-20.000528389, -29.932906043), (-22.83815823, -27.828376321), (-25.455844123, -25.455844123))
            Line((-25.455844123, -25.455844123), (-26.162950904, -26.162950904))
            ThreePointArc((-26.162950904, -26.162950904), (-23.472551514, -28.601386774), (-20.556098622, -30.764375655))
        make_face()
    cut_extrude_7_tool21 = extrude(cut_extrude_7_sk21.sketch, amount=-CUT_EXTRUDE_7_REACH, mode=Mode.PRIVATE) & part.part
    # 草图10 → 切除-拉伸7 (cut, up to next)
    with BuildSketch(Plane.XZ, mode=Mode.PRIVATE) as cut_extrude_7_sk22:
        with BuildLine():
            Line((-30.764375655, -20.556098622), (-29.932906043, -20.000528389))
            ThreePointArc((-29.932906043, -20.000528389), (-31.749165517, -16.970282526), (-33.25966317, -13.776603565))
            Line((-33.25966317, -13.776603565), (-34.183542703, -14.159286998))
            ThreePointArc((-34.183542703, -14.159286998), (-32.631086781, -17.441679263), (-30.764375655, -20.556098622))
        make_face()
    cut_extrude_7_tool22 = extrude(cut_extrude_7_sk22.sketch, amount=-CUT_EXTRUDE_7_REACH, mode=Mode.PRIVATE) & part.part
    # 草图10 → 切除-拉伸7 (cut, up to next)
    with BuildSketch(Plane.XZ, mode=Mode.PRIVATE) as cut_extrude_7_sk23:
        with BuildLine():
            Line((-34.183542703, -14.159286998), (-33.25966317, -13.776603565))
            ThreePointArc((-33.25966317, -13.776603565), (-34.449852086, -10.450248381), (-35.308270095, -7.023251593))
            Line((-35.308270095, -7.023251593), (-36.289055375, -7.218341915))
            ThreePointArc((-36.289055375, -7.218341915), (-35.406792422, -10.740533058), (-34.183542703, -14.159286998))
        make_face()
    cut_extrude_7_tool23 = extrude(cut_extrude_7_sk23.sketch, amount=-CUT_EXTRUDE_7_REACH, mode=Mode.PRIVATE) & part.part
    # 草图10 → 切除-拉伸7 (cut, up to next)
    with BuildSketch(Plane.XZ, mode=Mode.PRIVATE) as cut_extrude_7_sk24:
        with BuildLine():
            Line((-36.289055375, -7.218341915), (-35.308270095, -7.023251593))
            ThreePointArc((-35.308270095, -7.023251593), (-35.82665016, -3.528617052), (-36, 0))
            Line((-36, 0), (-37, 0))
            ThreePointArc((-37, 0), (-36.821834887, -3.626634192), (-36.289055375, -7.218341915))
        make_face()
    cut_extrude_7_tool24 = extrude(cut_extrude_7_sk24.sketch, amount=-CUT_EXTRUDE_7_REACH, mode=Mode.PRIVATE) & part.part
    add(cut_extrude_7_tool1.solids().sort_by_distance((-34.874422, 0, 10.57904))[0], mode=Mode.SUBTRACT)
    add(cut_extrude_7_tool2.solids().sort_by_distance((-32.140452, 0, 17.179429))[0], mode=Mode.SUBTRACT)
    add(cut_extrude_7_tool3.solids().sort_by_distance((-28.171342, 0, 23.119623))[0], mode=Mode.SUBTRACT)
    add(cut_extrude_7_tool4.solids().sort_by_distance((-17.179429, 0, 32.140452))[0], mode=Mode.SUBTRACT)
    add(cut_extrude_7_tool5.solids().sort_by_distance((-10.57904, 0, 34.874422))[0], mode=Mode.SUBTRACT)
    add(cut_extrude_7_tool6.solids().sort_by_distance((-3.572105, 0, 36.268189))[0], mode=Mode.SUBTRACT)
    add(cut_extrude_7_tool7.solids().sort_by_distance((10.57904, 0, 34.874422))[0], mode=Mode.SUBTRACT)
    add(cut_extrude_7_tool8.solids().sort_by_distance((17.179429, 0, 32.140452))[0], mode=Mode.SUBTRACT)
    add(cut_extrude_7_tool9.solids().sort_by_distance((23.119623, 0, 28.171342))[0], mode=Mode.SUBTRACT)
    add(cut_extrude_7_tool10.solids().sort_by_distance((32.140452, 0, 17.179429))[0], mode=Mode.SUBTRACT)
    add(cut_extrude_7_tool11.solids().sort_by_distance((34.874422, 0, 10.57904))[0], mode=Mode.SUBTRACT)
    add(cut_extrude_7_tool12.solids().sort_by_distance((36.268189, 0, 3.572105))[0], mode=Mode.SUBTRACT)
    add(cut_extrude_7_tool13.solids().sort_by_distance((34.874422, 0, -10.57904))[0], mode=Mode.SUBTRACT)
    add(cut_extrude_7_tool14.solids().sort_by_distance((32.140452, 0, -17.179429))[0], mode=Mode.SUBTRACT)
    add(cut_extrude_7_tool15.solids().sort_by_distance((28.171342, 0, -23.119623))[0], mode=Mode.SUBTRACT)
    add(cut_extrude_7_tool16.solids().sort_by_distance((17.179429, 0, -32.140452))[0], mode=Mode.SUBTRACT)
    add(cut_extrude_7_tool17.solids().sort_by_distance((10.57904, 0, -34.874422))[0], mode=Mode.SUBTRACT)
    add(cut_extrude_7_tool18.solids().sort_by_distance((3.572105, 0, -36.268189))[0], mode=Mode.SUBTRACT)
    add(cut_extrude_7_tool19.solids().sort_by_distance((-10.57904, 0, -34.874422))[0], mode=Mode.SUBTRACT)
    add(cut_extrude_7_tool20.solids().sort_by_distance((-17.179429, 0, -32.140452))[0], mode=Mode.SUBTRACT)
    add(cut_extrude_7_tool21.solids().sort_by_distance((-23.119623, 0, -28.171342))[0], mode=Mode.SUBTRACT)
    add(cut_extrude_7_tool22.solids().sort_by_distance((-32.140452, 0, -17.179429))[0], mode=Mode.SUBTRACT)
    add(cut_extrude_7_tool23.solids().sort_by_distance((-34.874422, 0, -10.57904))[0], mode=Mode.SUBTRACT)
    add(cut_extrude_7_tool24.solids().sort_by_distance((-36.268189, 0, -3.572105))[0], mode=Mode.SUBTRACT)

    # 草图14 → 凸台-拉伸4 (add)
    with BuildSketch(Plane(origin=(0, 40, 0), x_dir=(1, 0, 0), z_dir=(0, 1, 0)).offset(EXTRUDE_START)):
        Circle(SKETCH_14_R)
    extrude(amount=EXTRUDE_4_DEPTH)

    # 草图15 → 切除-拉伸11 (cut)
    with BuildSketch(Plane(origin=(0, 40, 0), x_dir=(1, 0, 0), z_dir=(0, 1, 0))):
        with BuildLine():
            ThreePointArc((17.320508062, 10.000000023), (19.318516522, 5.176380915), (20, 0))
            ThreePointArc((20, 0), (25, -5), (30, 0))
            ThreePointArc((30, 0), (28.97777479, 7.764571347), (25.980762119, 14.99999999))
            ThreePointArc((25.980762119, 14.99999999), (19.150635111, 16.830127029), (17.320508062, 10.000000023))
        make_face()
        with BuildLine():
            ThreePointArc((14.999999918, -25.980762161), (21.213203317, -21.213203554), (25.980761993, -15.000000208))
            ThreePointArc((25.980761993, -15.000000208), (24.150635217, -8.169873051), (17.320508096, -9.999999964))
            ThreePointArc((17.320508096, -9.999999964), (14.142135686, -14.142135561), (10.000000118, -17.320508008))
            ThreePointArc((10.000000118, -17.320508008), (8.169872923, -24.150634995), (14.999999918, -25.980762161))
        make_face()
        with BuildLine():
            ThreePointArc((4.9e-08, 20), (5.176380982, 19.318516504), (10.0000001, 17.320508018))
            ThreePointArc((10.0000001, 17.320508018), (16.830127018, 19.150635093), (15.000000104, 25.980762053))
            ThreePointArc((15.000000104, 25.980762053), (7.764571417, 28.977774771), (1.3e-08, 30))
            ThreePointArc((1.3e-08, 30), (-5, 24.999999982), (4.9e-08, 20))
        make_face()
        with BuildLine():
            ThreePointArc((-15.000000208, -25.980761993), (-7.764571442, -28.977774765), (5.6e-08, -30))
            ThreePointArc((5.6e-08, -30), (5, -24.999999981), (1.9e-08, -20))
            ThreePointArc((1.9e-08, -20), (-5.176380827, -19.318516546), (-9.999999881, -17.320508144))
            ThreePointArc((-9.999999881, -17.320508144), (-16.830126924, -19.150634931), (-15.000000208, -25.980761993))
        make_face()
        with BuildLine():
            ThreePointArc((-17.320508134, 9.999999899), (-14.142135725, 14.142135523), (-10.000000147, 17.320507991))
            ThreePointArc((-10.000000147, 17.320507991), (-8.169872936, 24.150635016), (-14.99999999, 25.980762119))
            ThreePointArc((-14.99999999, 25.980762119), (-21.213203332, 21.213203539), (-25.980761973, 15.000000244))
            ThreePointArc((-25.980761973, 15.000000244), (-24.150635267, 8.169873081), (-17.320508134, 9.999999899))
        make_face()
        with BuildLine():
            ThreePointArc((-30, -8.8e-08), (-28.97777479, -7.76457135), (-25.980762161, -14.999999918))
            ThreePointArc((-25.980762161, -14.999999918), (-19.150635148, -16.83012705), (-17.320508061, -10.000000025))
            ThreePointArc((-17.320508061, -10.000000025), (-19.318516522, -5.176380916), (-20, 0))
            ThreePointArc((-20, 0), (-25.000000044, 5), (-30, -8.8e-08))
        make_face()
    extrude(amount=-CUT_EXTRUDE_11_DEPTH, mode=Mode.SUBTRACT)

    # 草图17 → 切除-拉伸12 (cut)
    with BuildSketch(Plane(origin=(0, 40, 0), x_dir=(1, 0, 0), z_dir=(0, 1, 0)).offset(CUT_EXTRUDE_START)):
        with Locations(Location((0, 0, 0), (0, 0, 270))):
            Circle(SKETCH_17_R)
    extrude(amount=CUT_EXTRUDE_12_DEPTH, mode=Mode.SUBTRACT)

    # 草图20 → 旋转1 (revolve)
    with BuildSketch(Plane.XY, mode=Mode.PRIVATE) as revolve_1_sk:
        with BuildLine():
            Line((-7, 40), (-7, 41.500033854))
            ThreePointArc((-7, 41.500033854), (-7.278579145, 40.593565511), (-8.018154145, 40))
            Line((-8.018154145, 40), (-7, 40))
        make_face()
    revolve(revolve_1_sk.sketch.rotate(Axis((0, -950, 0), (0, 1, 0)), 180), axis=Axis((0, -950, 0), (0, 1, 0)))


solid = part.part
